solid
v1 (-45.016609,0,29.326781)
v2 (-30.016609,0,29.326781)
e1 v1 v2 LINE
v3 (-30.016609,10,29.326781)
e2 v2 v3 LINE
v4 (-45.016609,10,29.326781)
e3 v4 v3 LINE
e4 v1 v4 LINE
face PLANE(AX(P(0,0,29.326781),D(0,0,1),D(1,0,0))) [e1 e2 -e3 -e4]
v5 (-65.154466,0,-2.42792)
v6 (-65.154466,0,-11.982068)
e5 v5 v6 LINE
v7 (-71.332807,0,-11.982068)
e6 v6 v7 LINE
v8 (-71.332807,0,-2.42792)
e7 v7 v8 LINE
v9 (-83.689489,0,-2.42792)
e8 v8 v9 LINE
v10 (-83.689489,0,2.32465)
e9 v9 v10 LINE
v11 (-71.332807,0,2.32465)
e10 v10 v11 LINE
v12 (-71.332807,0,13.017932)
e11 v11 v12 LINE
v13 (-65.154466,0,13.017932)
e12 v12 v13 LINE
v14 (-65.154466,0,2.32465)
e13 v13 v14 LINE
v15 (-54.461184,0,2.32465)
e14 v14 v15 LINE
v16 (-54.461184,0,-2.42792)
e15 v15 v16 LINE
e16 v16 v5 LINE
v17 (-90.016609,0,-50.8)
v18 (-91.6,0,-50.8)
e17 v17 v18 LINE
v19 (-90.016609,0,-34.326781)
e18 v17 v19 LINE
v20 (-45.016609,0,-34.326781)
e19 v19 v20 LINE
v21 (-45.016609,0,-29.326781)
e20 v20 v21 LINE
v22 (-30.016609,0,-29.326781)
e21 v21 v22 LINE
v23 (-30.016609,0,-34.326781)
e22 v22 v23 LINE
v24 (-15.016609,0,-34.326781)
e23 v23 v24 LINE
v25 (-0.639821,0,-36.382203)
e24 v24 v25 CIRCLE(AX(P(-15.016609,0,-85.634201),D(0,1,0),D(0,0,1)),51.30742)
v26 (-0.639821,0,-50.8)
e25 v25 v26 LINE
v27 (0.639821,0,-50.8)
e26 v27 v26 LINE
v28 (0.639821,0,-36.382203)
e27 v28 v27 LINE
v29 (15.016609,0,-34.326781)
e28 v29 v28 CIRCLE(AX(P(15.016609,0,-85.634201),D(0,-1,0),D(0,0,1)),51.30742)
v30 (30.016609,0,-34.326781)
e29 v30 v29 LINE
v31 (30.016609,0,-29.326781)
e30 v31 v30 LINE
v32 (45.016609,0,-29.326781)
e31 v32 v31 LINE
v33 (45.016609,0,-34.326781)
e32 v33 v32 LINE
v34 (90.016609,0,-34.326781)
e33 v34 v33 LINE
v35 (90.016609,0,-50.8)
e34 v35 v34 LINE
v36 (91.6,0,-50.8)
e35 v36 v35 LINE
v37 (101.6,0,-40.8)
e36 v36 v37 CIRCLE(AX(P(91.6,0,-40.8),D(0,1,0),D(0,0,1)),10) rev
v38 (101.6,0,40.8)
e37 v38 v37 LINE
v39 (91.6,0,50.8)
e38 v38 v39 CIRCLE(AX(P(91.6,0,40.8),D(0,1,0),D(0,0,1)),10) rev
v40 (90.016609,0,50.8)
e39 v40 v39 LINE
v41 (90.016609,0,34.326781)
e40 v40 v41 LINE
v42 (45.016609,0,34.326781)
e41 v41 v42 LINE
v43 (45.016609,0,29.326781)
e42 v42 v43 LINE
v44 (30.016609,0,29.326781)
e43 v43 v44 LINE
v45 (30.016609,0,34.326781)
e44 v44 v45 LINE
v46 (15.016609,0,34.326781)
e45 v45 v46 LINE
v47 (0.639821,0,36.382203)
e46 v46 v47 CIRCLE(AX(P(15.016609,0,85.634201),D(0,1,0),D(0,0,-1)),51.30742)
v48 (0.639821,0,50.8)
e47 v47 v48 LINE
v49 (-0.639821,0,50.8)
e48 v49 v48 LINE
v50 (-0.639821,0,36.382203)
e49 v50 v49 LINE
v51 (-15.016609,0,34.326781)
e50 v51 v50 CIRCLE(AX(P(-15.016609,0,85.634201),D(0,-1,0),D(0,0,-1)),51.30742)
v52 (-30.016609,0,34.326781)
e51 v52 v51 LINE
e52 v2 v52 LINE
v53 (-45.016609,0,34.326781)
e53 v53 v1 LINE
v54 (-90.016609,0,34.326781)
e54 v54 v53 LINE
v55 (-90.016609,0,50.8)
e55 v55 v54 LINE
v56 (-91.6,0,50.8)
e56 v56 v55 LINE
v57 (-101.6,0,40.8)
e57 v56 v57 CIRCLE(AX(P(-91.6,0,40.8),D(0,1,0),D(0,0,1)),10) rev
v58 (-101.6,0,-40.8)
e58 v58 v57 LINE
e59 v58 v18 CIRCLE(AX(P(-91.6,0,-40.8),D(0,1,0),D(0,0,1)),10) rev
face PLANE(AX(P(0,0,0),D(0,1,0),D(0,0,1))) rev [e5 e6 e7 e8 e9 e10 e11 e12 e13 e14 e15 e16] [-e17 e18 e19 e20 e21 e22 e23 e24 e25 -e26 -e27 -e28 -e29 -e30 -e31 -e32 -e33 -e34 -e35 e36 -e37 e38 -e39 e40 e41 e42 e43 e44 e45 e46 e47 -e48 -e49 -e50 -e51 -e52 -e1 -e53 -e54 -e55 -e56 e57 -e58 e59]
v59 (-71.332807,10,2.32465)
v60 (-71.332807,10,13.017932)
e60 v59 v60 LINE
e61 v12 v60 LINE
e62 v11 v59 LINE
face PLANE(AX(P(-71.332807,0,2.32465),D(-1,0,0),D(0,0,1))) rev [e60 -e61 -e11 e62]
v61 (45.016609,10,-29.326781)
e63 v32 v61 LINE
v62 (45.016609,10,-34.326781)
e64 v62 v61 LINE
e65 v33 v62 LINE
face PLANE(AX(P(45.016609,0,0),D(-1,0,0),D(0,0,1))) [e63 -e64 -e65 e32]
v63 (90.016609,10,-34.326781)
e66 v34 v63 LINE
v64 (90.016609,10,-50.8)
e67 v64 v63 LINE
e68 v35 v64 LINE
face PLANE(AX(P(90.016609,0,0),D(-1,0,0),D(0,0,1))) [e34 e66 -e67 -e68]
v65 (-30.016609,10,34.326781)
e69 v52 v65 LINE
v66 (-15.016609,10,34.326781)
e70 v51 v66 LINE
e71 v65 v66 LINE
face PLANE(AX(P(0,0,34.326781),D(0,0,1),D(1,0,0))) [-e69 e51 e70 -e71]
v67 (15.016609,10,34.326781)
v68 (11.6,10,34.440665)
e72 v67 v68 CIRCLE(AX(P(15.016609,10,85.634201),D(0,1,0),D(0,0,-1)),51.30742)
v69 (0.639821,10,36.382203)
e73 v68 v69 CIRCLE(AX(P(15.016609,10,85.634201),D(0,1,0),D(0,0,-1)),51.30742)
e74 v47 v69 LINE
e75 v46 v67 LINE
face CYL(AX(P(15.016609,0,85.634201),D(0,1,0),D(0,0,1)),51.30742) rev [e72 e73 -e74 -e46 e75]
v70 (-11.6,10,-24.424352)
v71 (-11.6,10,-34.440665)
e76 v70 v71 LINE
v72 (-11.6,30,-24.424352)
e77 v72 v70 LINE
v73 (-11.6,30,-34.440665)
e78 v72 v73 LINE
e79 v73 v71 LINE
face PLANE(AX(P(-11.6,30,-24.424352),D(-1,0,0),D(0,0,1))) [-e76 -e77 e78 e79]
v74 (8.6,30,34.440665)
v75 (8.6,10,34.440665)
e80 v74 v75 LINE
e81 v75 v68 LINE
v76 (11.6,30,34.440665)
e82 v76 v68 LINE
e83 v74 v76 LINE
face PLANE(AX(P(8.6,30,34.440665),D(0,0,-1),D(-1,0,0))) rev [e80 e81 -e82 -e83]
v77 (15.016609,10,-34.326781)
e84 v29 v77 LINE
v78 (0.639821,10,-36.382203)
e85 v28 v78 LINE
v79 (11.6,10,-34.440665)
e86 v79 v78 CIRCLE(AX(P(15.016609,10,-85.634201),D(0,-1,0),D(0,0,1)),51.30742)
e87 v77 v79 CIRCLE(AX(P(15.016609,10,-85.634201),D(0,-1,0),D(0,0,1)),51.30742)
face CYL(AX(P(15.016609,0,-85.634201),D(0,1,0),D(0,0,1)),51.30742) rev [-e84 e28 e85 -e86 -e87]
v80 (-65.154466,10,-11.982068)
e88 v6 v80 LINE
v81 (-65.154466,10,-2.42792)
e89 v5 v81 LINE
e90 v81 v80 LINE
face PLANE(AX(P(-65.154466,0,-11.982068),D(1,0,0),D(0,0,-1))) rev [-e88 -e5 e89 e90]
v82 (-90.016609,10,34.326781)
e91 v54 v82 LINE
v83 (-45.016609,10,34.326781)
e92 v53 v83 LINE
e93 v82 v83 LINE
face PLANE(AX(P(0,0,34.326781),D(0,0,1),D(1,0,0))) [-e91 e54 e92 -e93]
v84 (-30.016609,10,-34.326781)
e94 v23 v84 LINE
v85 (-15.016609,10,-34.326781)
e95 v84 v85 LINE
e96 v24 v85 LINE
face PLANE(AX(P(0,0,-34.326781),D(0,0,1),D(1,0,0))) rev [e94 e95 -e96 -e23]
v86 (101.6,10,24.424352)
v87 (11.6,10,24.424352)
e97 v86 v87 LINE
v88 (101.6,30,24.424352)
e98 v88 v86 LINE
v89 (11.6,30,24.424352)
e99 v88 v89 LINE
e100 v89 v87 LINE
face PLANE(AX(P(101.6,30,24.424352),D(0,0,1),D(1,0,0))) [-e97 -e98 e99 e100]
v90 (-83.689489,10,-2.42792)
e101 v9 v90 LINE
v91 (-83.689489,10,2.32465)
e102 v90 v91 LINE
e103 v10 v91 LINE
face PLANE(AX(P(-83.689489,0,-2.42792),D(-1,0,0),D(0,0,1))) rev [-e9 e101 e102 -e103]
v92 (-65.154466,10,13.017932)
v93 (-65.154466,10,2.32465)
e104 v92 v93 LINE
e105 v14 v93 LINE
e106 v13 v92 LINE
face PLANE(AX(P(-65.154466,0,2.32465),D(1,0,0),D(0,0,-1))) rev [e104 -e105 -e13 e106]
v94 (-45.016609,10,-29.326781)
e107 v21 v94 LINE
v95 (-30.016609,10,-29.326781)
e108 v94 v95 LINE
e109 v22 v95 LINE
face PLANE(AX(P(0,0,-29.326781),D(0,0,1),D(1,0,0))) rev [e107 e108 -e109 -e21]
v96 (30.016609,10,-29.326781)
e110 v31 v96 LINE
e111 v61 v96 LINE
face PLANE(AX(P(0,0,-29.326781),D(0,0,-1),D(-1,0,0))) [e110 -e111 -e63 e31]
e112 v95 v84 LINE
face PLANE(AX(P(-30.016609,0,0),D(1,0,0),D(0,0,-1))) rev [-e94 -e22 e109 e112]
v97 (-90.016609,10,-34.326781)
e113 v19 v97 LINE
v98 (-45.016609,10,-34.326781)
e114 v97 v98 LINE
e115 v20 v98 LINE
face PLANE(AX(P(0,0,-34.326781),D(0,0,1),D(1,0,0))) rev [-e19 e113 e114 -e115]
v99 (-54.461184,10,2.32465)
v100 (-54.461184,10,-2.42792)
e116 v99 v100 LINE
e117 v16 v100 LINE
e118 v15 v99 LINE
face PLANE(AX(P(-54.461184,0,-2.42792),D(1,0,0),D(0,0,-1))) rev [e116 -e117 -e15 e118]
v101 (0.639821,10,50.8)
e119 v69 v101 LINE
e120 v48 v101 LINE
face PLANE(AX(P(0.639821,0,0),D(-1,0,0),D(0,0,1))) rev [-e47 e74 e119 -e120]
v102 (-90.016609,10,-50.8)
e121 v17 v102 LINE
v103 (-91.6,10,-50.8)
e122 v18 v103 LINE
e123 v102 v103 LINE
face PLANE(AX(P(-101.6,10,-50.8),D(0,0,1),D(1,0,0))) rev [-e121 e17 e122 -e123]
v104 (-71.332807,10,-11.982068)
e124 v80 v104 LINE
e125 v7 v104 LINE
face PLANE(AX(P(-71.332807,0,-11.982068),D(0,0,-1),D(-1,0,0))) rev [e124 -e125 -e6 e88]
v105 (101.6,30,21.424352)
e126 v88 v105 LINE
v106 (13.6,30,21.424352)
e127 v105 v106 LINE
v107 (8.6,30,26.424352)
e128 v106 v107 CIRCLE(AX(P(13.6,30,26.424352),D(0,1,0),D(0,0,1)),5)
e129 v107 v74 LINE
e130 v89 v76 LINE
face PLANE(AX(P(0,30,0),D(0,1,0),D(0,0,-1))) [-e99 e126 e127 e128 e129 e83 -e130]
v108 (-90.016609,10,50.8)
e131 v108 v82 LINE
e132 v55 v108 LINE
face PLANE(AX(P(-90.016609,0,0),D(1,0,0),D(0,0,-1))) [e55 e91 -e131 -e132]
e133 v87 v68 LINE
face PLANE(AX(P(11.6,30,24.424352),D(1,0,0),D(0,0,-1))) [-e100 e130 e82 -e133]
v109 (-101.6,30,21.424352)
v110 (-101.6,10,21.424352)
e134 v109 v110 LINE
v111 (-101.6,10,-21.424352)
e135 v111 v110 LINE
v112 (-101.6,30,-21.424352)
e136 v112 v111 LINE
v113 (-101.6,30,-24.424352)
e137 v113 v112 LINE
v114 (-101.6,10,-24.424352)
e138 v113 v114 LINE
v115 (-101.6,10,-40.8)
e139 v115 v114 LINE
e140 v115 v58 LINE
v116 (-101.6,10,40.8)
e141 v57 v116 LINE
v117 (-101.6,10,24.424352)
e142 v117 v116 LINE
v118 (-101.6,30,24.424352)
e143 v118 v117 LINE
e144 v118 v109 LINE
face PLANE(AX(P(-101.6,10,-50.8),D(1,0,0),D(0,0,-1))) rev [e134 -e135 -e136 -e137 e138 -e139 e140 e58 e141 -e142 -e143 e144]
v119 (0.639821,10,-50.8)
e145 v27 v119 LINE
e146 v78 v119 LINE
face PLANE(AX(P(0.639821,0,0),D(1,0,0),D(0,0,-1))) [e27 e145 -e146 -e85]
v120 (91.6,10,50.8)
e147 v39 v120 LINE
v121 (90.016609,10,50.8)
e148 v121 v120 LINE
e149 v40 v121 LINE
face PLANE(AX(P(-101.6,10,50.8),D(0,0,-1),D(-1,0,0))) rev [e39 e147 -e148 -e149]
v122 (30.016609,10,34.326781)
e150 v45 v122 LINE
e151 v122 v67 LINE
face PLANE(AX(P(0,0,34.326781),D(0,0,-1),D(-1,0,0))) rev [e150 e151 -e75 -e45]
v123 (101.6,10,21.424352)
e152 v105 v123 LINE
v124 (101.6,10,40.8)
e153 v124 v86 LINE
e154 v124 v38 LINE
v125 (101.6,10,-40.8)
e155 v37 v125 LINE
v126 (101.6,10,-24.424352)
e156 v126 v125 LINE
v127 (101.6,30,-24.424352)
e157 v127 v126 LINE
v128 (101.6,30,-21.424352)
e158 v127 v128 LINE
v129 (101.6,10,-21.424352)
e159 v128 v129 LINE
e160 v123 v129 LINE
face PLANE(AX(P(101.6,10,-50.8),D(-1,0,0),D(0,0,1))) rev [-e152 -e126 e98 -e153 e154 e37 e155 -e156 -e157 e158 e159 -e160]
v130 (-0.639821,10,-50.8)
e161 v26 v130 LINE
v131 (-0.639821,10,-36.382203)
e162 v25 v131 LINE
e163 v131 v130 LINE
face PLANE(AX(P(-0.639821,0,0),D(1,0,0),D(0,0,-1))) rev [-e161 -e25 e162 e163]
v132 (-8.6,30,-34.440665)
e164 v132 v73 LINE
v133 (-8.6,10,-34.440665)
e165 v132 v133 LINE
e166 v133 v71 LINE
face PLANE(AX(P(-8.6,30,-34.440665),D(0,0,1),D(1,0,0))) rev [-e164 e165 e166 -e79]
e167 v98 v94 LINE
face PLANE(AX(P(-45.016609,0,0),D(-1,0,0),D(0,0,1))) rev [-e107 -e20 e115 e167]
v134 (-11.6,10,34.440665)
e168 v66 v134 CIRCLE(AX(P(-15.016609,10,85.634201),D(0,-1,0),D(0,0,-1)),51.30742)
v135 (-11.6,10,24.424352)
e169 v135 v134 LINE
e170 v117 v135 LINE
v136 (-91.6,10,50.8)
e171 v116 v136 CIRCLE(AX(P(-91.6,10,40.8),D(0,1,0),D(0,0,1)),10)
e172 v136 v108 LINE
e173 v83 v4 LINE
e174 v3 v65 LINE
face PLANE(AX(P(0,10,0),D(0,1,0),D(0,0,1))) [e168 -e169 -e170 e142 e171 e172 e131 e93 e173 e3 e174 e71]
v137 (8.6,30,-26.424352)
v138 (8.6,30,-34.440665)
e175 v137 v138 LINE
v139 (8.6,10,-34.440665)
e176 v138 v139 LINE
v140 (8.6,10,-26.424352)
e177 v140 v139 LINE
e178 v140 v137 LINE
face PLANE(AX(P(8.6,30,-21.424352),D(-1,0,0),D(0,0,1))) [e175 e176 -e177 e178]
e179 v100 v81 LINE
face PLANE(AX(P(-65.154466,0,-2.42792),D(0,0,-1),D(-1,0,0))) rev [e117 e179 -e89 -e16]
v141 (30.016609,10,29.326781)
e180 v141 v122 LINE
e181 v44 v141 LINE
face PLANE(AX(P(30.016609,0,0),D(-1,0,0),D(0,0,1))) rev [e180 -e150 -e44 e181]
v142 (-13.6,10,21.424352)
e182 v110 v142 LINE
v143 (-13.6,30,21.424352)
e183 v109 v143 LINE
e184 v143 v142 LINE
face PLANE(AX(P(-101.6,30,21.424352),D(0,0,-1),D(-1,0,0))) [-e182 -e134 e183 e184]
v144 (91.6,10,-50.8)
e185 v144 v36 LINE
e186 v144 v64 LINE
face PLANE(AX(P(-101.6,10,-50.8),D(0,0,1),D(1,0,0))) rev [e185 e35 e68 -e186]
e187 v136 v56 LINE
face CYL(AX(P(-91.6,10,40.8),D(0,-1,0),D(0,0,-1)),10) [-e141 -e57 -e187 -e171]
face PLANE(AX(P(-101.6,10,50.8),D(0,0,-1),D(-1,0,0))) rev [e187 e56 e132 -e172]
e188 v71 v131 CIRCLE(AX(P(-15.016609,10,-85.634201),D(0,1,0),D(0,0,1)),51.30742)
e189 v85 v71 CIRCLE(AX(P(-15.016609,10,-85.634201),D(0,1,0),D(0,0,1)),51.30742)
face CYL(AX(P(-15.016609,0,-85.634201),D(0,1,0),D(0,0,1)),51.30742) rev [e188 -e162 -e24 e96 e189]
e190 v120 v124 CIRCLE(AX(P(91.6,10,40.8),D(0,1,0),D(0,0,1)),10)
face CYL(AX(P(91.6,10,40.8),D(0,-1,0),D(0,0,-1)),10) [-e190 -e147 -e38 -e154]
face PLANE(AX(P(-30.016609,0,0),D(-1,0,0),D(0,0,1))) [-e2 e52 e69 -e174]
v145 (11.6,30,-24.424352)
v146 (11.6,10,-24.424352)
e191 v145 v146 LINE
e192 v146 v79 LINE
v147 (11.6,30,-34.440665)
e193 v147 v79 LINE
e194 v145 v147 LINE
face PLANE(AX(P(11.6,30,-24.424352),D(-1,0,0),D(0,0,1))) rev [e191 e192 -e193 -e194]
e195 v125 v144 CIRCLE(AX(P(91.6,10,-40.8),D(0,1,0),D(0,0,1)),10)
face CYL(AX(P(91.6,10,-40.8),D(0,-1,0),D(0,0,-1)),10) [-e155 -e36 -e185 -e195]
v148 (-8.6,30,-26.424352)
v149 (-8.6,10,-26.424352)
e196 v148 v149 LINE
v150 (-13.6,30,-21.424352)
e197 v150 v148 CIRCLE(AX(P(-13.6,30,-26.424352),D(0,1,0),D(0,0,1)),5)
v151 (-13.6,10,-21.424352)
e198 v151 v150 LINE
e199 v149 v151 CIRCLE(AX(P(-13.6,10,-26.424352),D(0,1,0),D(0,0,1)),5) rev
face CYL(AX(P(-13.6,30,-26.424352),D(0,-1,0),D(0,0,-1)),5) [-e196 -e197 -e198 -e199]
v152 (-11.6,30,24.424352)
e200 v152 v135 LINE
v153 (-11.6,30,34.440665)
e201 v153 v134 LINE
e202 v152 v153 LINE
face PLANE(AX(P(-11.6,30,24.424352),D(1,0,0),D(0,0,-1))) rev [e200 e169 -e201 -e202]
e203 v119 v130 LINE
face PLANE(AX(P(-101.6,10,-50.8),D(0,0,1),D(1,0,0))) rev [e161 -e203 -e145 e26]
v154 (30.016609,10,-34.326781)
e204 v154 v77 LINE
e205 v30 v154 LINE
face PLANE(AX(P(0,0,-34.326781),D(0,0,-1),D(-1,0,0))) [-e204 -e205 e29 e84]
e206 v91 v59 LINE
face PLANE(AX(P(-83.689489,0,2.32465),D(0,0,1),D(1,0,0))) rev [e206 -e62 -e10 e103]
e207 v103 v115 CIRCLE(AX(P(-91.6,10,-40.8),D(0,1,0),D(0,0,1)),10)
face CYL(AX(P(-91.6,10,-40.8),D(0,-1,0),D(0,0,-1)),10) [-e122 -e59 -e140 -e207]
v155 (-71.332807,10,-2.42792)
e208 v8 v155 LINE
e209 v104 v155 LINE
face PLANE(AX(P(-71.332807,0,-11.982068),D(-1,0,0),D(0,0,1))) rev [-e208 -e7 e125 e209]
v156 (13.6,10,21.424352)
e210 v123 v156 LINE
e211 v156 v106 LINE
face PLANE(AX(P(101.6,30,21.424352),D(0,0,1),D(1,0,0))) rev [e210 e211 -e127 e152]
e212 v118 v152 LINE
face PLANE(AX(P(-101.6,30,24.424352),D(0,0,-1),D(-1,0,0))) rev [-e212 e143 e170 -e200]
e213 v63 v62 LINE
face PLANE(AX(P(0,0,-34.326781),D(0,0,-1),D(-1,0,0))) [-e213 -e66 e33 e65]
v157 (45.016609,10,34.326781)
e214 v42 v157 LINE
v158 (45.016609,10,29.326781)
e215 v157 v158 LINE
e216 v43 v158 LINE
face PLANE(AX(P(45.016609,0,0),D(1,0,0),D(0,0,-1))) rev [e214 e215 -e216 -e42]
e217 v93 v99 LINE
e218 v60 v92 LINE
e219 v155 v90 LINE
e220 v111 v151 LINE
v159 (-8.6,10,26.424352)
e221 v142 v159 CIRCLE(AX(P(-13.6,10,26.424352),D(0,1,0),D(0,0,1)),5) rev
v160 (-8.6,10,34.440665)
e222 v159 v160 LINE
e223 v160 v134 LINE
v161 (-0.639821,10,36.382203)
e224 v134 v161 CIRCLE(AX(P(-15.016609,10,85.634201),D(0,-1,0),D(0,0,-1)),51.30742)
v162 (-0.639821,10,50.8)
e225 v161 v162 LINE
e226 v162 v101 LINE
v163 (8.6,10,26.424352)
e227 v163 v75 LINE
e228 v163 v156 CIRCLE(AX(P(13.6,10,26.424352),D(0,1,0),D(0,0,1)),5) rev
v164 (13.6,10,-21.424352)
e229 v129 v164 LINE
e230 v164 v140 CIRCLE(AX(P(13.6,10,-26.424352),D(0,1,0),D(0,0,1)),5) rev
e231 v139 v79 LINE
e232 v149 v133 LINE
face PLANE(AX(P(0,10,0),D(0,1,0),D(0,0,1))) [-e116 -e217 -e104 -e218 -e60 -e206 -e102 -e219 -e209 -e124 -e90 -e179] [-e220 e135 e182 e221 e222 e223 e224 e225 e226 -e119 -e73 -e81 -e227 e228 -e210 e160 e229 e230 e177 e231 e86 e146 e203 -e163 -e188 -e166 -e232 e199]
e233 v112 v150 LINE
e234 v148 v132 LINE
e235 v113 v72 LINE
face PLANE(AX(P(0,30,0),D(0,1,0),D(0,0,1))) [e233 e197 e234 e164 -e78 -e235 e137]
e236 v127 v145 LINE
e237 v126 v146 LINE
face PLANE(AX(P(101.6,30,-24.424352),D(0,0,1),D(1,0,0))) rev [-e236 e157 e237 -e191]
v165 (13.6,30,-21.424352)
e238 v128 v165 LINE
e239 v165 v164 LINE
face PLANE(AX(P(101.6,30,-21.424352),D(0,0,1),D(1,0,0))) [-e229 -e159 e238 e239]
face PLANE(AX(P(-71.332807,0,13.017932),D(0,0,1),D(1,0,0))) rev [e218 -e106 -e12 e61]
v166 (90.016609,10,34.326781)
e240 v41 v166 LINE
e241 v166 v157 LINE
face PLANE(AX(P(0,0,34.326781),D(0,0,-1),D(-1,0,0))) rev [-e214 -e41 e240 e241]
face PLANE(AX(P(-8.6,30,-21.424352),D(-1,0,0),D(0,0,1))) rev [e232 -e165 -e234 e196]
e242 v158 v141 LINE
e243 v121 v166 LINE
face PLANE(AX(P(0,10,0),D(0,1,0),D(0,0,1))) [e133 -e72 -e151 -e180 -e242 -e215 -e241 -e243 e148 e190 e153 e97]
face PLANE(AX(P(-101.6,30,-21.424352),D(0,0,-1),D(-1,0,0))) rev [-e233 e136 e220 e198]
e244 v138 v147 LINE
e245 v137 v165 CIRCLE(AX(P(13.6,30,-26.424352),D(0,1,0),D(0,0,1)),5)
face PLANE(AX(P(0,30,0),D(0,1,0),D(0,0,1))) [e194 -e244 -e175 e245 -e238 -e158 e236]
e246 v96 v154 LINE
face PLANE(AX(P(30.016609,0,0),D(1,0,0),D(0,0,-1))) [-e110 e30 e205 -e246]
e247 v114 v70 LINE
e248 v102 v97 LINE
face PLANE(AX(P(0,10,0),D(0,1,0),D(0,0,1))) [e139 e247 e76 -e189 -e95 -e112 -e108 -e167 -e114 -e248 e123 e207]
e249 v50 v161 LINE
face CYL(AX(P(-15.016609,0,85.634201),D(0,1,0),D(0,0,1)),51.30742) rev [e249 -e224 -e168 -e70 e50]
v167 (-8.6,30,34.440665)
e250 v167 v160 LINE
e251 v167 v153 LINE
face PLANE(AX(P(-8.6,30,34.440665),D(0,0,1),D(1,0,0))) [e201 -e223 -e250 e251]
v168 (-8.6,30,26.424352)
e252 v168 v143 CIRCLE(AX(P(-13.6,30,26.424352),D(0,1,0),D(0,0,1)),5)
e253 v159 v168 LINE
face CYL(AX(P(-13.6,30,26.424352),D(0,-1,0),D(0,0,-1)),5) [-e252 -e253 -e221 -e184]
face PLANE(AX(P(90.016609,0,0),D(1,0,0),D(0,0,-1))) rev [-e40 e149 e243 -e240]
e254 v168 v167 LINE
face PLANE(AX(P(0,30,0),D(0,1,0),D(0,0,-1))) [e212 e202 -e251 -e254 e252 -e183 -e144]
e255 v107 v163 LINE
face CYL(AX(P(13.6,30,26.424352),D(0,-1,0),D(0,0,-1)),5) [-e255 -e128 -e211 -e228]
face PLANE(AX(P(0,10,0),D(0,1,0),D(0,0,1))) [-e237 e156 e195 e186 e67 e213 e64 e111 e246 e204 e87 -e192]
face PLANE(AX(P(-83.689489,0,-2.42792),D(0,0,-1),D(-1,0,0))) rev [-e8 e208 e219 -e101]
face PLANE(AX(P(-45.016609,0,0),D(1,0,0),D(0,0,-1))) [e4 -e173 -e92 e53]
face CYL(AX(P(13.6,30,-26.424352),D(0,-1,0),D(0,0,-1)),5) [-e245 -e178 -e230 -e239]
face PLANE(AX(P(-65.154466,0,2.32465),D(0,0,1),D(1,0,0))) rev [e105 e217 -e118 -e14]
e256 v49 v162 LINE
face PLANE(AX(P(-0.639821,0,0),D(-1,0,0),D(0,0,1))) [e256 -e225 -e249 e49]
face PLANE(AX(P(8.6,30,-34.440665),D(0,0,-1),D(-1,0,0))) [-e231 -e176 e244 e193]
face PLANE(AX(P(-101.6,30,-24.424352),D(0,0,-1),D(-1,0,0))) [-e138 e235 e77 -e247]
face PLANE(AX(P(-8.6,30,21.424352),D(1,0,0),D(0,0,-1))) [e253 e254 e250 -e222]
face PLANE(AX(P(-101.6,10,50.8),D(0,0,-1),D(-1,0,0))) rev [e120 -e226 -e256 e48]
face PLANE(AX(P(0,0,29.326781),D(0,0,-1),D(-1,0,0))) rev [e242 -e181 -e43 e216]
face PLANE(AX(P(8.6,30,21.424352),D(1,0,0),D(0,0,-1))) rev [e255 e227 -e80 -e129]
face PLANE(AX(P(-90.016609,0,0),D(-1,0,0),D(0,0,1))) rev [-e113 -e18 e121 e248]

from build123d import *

# Parameters (mm, degrees)
SKETCH1_W            = 203.2
SKETCH1_H            = 101.6
BOSS_EXTRUDE1_DEPTH  = 10
CUT_EXTRUDE1_DEPTH   = 115.031574575
MIRROR3_COPY_1_DEPTH = 115.031574575
FILLET2_R            = 10
FILLET3_R            = 10
FILLET4_R            = 10
FILLET5_R            = 10
CUT_EXTRUDE2_DEPTH   = 115.031574575
BOSS_EXTRUDE8_DEPTH  = 20
FILLET9_R            = 5
FILLET9_OF_MIRROR7_R = 5
MIRROR9_START        = 10
MIRROR9_DEPTH        = 20


# Read off the part's stored shape, not the designer's step: Mirror9
with BuildPart() as part:
    # Sketch1 → Boss-Extrude1 (new body)
    with BuildSketch(Plane(origin=(0, 0, 0), x_dir=(1, 0, 0), z_dir=(0, 1, 0))):
        Rectangle(SKETCH1_W, SKETCH1_H)
    extrude(amount=BOSS_EXTRUDE1_DEPTH)

    # Sketch4 → Cut-Extrude1 (cut, through all)
    with BuildSketch(Plane(origin=(0, 10, 0), x_dir=(1, 0, 0), z_dir=(0, 1, 0))):
        with BuildLine():
            Line((-30.016608914, 34.326781051), (-15.016608914, 34.326781051))
            ThreePointArc((-15.016608914, 34.326781051), (-7.755121488, 34.843235841), (-0.639820714, 36.382203056))
            Line((-0.639820714, 36.382203056), (-0.639820714, 56.908402461))
            Line((-0.639820714, 56.908402461), (-90.016608914, 56.908402461))
            Line((-90.016608914, 56.908402461), (-90.016608914, 34.326781051))
            Line((-90.016608914, 34.326781051), (-45.016608914, 34.326781051))
            Line((-45.016608914, 34.326781051), (-45.016608914, 29.326781051))
            Line((-45.016608914, 29.326781051), (-30.016608914, 29.326781051))
            Line((-30.016608914, 29.326781051), (-30.016608914, 34.326781051))
        make_face()
    cut_extrude1 = extrude(amount=-CUT_EXTRUDE1_DEPTH, mode=Mode.SUBTRACT)

    # Mirror2: Cut-Extrude1 across plane
    add(cut_extrude1.mirror(Plane.XY), mode=Mode.SUBTRACT)

    # Mirror3: Cut-Extrude1 across plane
    add(cut_extrude1.mirror(Plane(origin=(0, 0, 0), x_dir=(0, 0, 1), z_dir=(1, 0, 0))), mode=Mode.SUBTRACT)

    # Mirror3 copy 1 sketch → Mirror3 copy 1 (cut, through all)
    with BuildSketch(Plane(origin=(0, 10, 0), x_dir=(-1, 0, 0), z_dir=(0, 1, 0))):
        with BuildLine():
            Line((-30.016608914, 34.326781051), (-15.016608914, 34.326781051))
            ThreePointArc((-15.016608914, 34.326781051), (-7.755121488, 34.843235841), (-0.639820714, 36.382203056))
            Line((-0.639820714, 36.382203056), (-0.639820714, 56.908402461))
            Line((-0.639820714, 56.908402461), (-90.016608914, 56.908402461))
            Line((-90.016608914, 56.908402461), (-90.016608914, 34.326781051))
            Line((-90.016608914, 34.326781051), (-45.016608914, 34.326781051))
            Line((-45.016608914, 34.326781051), (-45.016608914, 29.326781051))
            Line((-45.016608914, 29.326781051), (-30.016608914, 29.326781051))
            Line((-30.016608914, 29.326781051), (-30.016608914, 34.326781051))
        make_face()
    extrude(amount=-MIRROR3_COPY_1_DEPTH, mode=Mode.SUBTRACT)

    # Fillet2
    fillet2_edges = [part.edges().sort_by_distance(p)[0] for p in [
        (-101.6, 5, 50.8),
    ]]
    fillet(fillet2_edges, radius=FILLET2_R)

    # Fillet3
    fillet3_edges = [part.edges().sort_by_distance(p)[0] for p in [
        (-101.6, 5, -50.8),
    ]]
    fillet(fillet3_edges, radius=FILLET3_R)

    # Fillet4
    fillet4_edges = [part.edges().sort_by_distance(p)[0] for p in [
        (101.6, 5, -50.8),
    ]]
    fillet(fillet4_edges, radius=FILLET4_R)

    # Fillet5
    fillet5_edges = [part.edges().sort_by_distance(p)[0] for p in [
        (101.6, 5, 50.8),
    ]]
    fillet(fillet5_edges, radius=FILLET5_R)

    # Sketch6 → Cut-Extrude2 (cut, through all)
    with BuildSketch(Plane(origin=(0, 10, 0), x_dir=(1, 0, 0), z_dir=(0, 1, 0))):
        Polygon((-65.154466358, 2.427920334), (-54.461184026, 2.427920334), (-54.461184026, -2.324649591), (-65.154466358, -2.324649591), (-65.154466358, -13.017931923), (-71.33280726, -13.017931923), (-71.33280726, -2.324649591), (-83.689489065, -2.324649591), (-83.689489065, 2.427920334), (-71.33280726, 2.427920334), (-71.33280726, 11.982068077), (-65.154466358, 11.982068077), align=None)
    extrude(amount=-CUT_EXTRUDE2_DEPTH, mode=Mode.SUBTRACT)

    # Sketch11 → Boss-Extrude8 (add)
    with BuildSketch(Plane(origin=(0, 10, 0), x_dir=(1, 0, 0), z_dir=(0, 1, 0))):
        Polygon((-101.6, 24.424351811), (-11.6, 24.424351811), (-11.6, 34.440665029), (-8.6, 34.440665029), (-8.6, 21.424351811), (-101.6, 21.424351811), align=None)
    boss_extrude8 = extrude(amount=BOSS_EXTRUDE8_DEPTH)

    # Fillet9
    fillet9_edges = [part.edges().sort_by_distance(p)[0] for p in [
        (-8.6, 20, -21.424351811),
    ]]
    fillet(fillet9_edges, radius=FILLET9_R)

    # Mirror7: Boss-Extrude8 across plane
    add(boss_extrude8.mirror(Plane.XY))

    # Fillet9 of Mirror7
    fillet9_of_mirror7_edges = [part.edges().sort_by_distance(p)[0] for p in [
        (-8.6, 20, 21.424351811),
    ]]
    fillet(fillet9_of_mirror7_edges, radius=FILLET9_OF_MIRROR7_R)

    # Mirror9 outline → Mirror9 (add)
    with BuildSketch(Plane(origin=(0, 0, 0), x_dir=(1, 0, 0), z_dir=(0, 1, 0)).offset(MIRROR9_START)):
        with BuildLine():
            Line((11.6, 24.424351811), (11.6, 34.440665029))
            Line((11.6, 34.440665029), (8.6, 34.440665029))
            Line((8.6, 34.440665029), (8.6, 26.424351811))
            ThreePointArc((8.6, 26.424351811), (10.064466094, 22.888817905), (13.6, 21.424351811))
            Line((13.6, 21.424351811), (101.6, 21.424351811))
            Line((101.6, 21.424351811), (101.6, 24.424351811))
            Line((101.6, 24.424351811), (11.6, 24.424351811))
        make_face()
        with BuildLine():
            Line((101.6, -24.424351811), (101.6, -21.424351811))
            Line((101.6, -21.424351811), (13.6, -21.424351811))
            ThreePointArc((13.6, -21.424351811), (10.064466094, -22.888817905), (8.6, -26.424351811))
            Line((8.6, -26.424351811), (8.6, -34.440665029))
            Line((8.6, -34.440665029), (11.6, -34.440665029))
            Line((11.6, -34.440665029), (11.6, -24.424351811))
            Line((11.6, -24.424351811), (101.6, -24.424351811))
        make_face()
    extrude(amount=MIRROR9_DEPTH)


solid = part.part
